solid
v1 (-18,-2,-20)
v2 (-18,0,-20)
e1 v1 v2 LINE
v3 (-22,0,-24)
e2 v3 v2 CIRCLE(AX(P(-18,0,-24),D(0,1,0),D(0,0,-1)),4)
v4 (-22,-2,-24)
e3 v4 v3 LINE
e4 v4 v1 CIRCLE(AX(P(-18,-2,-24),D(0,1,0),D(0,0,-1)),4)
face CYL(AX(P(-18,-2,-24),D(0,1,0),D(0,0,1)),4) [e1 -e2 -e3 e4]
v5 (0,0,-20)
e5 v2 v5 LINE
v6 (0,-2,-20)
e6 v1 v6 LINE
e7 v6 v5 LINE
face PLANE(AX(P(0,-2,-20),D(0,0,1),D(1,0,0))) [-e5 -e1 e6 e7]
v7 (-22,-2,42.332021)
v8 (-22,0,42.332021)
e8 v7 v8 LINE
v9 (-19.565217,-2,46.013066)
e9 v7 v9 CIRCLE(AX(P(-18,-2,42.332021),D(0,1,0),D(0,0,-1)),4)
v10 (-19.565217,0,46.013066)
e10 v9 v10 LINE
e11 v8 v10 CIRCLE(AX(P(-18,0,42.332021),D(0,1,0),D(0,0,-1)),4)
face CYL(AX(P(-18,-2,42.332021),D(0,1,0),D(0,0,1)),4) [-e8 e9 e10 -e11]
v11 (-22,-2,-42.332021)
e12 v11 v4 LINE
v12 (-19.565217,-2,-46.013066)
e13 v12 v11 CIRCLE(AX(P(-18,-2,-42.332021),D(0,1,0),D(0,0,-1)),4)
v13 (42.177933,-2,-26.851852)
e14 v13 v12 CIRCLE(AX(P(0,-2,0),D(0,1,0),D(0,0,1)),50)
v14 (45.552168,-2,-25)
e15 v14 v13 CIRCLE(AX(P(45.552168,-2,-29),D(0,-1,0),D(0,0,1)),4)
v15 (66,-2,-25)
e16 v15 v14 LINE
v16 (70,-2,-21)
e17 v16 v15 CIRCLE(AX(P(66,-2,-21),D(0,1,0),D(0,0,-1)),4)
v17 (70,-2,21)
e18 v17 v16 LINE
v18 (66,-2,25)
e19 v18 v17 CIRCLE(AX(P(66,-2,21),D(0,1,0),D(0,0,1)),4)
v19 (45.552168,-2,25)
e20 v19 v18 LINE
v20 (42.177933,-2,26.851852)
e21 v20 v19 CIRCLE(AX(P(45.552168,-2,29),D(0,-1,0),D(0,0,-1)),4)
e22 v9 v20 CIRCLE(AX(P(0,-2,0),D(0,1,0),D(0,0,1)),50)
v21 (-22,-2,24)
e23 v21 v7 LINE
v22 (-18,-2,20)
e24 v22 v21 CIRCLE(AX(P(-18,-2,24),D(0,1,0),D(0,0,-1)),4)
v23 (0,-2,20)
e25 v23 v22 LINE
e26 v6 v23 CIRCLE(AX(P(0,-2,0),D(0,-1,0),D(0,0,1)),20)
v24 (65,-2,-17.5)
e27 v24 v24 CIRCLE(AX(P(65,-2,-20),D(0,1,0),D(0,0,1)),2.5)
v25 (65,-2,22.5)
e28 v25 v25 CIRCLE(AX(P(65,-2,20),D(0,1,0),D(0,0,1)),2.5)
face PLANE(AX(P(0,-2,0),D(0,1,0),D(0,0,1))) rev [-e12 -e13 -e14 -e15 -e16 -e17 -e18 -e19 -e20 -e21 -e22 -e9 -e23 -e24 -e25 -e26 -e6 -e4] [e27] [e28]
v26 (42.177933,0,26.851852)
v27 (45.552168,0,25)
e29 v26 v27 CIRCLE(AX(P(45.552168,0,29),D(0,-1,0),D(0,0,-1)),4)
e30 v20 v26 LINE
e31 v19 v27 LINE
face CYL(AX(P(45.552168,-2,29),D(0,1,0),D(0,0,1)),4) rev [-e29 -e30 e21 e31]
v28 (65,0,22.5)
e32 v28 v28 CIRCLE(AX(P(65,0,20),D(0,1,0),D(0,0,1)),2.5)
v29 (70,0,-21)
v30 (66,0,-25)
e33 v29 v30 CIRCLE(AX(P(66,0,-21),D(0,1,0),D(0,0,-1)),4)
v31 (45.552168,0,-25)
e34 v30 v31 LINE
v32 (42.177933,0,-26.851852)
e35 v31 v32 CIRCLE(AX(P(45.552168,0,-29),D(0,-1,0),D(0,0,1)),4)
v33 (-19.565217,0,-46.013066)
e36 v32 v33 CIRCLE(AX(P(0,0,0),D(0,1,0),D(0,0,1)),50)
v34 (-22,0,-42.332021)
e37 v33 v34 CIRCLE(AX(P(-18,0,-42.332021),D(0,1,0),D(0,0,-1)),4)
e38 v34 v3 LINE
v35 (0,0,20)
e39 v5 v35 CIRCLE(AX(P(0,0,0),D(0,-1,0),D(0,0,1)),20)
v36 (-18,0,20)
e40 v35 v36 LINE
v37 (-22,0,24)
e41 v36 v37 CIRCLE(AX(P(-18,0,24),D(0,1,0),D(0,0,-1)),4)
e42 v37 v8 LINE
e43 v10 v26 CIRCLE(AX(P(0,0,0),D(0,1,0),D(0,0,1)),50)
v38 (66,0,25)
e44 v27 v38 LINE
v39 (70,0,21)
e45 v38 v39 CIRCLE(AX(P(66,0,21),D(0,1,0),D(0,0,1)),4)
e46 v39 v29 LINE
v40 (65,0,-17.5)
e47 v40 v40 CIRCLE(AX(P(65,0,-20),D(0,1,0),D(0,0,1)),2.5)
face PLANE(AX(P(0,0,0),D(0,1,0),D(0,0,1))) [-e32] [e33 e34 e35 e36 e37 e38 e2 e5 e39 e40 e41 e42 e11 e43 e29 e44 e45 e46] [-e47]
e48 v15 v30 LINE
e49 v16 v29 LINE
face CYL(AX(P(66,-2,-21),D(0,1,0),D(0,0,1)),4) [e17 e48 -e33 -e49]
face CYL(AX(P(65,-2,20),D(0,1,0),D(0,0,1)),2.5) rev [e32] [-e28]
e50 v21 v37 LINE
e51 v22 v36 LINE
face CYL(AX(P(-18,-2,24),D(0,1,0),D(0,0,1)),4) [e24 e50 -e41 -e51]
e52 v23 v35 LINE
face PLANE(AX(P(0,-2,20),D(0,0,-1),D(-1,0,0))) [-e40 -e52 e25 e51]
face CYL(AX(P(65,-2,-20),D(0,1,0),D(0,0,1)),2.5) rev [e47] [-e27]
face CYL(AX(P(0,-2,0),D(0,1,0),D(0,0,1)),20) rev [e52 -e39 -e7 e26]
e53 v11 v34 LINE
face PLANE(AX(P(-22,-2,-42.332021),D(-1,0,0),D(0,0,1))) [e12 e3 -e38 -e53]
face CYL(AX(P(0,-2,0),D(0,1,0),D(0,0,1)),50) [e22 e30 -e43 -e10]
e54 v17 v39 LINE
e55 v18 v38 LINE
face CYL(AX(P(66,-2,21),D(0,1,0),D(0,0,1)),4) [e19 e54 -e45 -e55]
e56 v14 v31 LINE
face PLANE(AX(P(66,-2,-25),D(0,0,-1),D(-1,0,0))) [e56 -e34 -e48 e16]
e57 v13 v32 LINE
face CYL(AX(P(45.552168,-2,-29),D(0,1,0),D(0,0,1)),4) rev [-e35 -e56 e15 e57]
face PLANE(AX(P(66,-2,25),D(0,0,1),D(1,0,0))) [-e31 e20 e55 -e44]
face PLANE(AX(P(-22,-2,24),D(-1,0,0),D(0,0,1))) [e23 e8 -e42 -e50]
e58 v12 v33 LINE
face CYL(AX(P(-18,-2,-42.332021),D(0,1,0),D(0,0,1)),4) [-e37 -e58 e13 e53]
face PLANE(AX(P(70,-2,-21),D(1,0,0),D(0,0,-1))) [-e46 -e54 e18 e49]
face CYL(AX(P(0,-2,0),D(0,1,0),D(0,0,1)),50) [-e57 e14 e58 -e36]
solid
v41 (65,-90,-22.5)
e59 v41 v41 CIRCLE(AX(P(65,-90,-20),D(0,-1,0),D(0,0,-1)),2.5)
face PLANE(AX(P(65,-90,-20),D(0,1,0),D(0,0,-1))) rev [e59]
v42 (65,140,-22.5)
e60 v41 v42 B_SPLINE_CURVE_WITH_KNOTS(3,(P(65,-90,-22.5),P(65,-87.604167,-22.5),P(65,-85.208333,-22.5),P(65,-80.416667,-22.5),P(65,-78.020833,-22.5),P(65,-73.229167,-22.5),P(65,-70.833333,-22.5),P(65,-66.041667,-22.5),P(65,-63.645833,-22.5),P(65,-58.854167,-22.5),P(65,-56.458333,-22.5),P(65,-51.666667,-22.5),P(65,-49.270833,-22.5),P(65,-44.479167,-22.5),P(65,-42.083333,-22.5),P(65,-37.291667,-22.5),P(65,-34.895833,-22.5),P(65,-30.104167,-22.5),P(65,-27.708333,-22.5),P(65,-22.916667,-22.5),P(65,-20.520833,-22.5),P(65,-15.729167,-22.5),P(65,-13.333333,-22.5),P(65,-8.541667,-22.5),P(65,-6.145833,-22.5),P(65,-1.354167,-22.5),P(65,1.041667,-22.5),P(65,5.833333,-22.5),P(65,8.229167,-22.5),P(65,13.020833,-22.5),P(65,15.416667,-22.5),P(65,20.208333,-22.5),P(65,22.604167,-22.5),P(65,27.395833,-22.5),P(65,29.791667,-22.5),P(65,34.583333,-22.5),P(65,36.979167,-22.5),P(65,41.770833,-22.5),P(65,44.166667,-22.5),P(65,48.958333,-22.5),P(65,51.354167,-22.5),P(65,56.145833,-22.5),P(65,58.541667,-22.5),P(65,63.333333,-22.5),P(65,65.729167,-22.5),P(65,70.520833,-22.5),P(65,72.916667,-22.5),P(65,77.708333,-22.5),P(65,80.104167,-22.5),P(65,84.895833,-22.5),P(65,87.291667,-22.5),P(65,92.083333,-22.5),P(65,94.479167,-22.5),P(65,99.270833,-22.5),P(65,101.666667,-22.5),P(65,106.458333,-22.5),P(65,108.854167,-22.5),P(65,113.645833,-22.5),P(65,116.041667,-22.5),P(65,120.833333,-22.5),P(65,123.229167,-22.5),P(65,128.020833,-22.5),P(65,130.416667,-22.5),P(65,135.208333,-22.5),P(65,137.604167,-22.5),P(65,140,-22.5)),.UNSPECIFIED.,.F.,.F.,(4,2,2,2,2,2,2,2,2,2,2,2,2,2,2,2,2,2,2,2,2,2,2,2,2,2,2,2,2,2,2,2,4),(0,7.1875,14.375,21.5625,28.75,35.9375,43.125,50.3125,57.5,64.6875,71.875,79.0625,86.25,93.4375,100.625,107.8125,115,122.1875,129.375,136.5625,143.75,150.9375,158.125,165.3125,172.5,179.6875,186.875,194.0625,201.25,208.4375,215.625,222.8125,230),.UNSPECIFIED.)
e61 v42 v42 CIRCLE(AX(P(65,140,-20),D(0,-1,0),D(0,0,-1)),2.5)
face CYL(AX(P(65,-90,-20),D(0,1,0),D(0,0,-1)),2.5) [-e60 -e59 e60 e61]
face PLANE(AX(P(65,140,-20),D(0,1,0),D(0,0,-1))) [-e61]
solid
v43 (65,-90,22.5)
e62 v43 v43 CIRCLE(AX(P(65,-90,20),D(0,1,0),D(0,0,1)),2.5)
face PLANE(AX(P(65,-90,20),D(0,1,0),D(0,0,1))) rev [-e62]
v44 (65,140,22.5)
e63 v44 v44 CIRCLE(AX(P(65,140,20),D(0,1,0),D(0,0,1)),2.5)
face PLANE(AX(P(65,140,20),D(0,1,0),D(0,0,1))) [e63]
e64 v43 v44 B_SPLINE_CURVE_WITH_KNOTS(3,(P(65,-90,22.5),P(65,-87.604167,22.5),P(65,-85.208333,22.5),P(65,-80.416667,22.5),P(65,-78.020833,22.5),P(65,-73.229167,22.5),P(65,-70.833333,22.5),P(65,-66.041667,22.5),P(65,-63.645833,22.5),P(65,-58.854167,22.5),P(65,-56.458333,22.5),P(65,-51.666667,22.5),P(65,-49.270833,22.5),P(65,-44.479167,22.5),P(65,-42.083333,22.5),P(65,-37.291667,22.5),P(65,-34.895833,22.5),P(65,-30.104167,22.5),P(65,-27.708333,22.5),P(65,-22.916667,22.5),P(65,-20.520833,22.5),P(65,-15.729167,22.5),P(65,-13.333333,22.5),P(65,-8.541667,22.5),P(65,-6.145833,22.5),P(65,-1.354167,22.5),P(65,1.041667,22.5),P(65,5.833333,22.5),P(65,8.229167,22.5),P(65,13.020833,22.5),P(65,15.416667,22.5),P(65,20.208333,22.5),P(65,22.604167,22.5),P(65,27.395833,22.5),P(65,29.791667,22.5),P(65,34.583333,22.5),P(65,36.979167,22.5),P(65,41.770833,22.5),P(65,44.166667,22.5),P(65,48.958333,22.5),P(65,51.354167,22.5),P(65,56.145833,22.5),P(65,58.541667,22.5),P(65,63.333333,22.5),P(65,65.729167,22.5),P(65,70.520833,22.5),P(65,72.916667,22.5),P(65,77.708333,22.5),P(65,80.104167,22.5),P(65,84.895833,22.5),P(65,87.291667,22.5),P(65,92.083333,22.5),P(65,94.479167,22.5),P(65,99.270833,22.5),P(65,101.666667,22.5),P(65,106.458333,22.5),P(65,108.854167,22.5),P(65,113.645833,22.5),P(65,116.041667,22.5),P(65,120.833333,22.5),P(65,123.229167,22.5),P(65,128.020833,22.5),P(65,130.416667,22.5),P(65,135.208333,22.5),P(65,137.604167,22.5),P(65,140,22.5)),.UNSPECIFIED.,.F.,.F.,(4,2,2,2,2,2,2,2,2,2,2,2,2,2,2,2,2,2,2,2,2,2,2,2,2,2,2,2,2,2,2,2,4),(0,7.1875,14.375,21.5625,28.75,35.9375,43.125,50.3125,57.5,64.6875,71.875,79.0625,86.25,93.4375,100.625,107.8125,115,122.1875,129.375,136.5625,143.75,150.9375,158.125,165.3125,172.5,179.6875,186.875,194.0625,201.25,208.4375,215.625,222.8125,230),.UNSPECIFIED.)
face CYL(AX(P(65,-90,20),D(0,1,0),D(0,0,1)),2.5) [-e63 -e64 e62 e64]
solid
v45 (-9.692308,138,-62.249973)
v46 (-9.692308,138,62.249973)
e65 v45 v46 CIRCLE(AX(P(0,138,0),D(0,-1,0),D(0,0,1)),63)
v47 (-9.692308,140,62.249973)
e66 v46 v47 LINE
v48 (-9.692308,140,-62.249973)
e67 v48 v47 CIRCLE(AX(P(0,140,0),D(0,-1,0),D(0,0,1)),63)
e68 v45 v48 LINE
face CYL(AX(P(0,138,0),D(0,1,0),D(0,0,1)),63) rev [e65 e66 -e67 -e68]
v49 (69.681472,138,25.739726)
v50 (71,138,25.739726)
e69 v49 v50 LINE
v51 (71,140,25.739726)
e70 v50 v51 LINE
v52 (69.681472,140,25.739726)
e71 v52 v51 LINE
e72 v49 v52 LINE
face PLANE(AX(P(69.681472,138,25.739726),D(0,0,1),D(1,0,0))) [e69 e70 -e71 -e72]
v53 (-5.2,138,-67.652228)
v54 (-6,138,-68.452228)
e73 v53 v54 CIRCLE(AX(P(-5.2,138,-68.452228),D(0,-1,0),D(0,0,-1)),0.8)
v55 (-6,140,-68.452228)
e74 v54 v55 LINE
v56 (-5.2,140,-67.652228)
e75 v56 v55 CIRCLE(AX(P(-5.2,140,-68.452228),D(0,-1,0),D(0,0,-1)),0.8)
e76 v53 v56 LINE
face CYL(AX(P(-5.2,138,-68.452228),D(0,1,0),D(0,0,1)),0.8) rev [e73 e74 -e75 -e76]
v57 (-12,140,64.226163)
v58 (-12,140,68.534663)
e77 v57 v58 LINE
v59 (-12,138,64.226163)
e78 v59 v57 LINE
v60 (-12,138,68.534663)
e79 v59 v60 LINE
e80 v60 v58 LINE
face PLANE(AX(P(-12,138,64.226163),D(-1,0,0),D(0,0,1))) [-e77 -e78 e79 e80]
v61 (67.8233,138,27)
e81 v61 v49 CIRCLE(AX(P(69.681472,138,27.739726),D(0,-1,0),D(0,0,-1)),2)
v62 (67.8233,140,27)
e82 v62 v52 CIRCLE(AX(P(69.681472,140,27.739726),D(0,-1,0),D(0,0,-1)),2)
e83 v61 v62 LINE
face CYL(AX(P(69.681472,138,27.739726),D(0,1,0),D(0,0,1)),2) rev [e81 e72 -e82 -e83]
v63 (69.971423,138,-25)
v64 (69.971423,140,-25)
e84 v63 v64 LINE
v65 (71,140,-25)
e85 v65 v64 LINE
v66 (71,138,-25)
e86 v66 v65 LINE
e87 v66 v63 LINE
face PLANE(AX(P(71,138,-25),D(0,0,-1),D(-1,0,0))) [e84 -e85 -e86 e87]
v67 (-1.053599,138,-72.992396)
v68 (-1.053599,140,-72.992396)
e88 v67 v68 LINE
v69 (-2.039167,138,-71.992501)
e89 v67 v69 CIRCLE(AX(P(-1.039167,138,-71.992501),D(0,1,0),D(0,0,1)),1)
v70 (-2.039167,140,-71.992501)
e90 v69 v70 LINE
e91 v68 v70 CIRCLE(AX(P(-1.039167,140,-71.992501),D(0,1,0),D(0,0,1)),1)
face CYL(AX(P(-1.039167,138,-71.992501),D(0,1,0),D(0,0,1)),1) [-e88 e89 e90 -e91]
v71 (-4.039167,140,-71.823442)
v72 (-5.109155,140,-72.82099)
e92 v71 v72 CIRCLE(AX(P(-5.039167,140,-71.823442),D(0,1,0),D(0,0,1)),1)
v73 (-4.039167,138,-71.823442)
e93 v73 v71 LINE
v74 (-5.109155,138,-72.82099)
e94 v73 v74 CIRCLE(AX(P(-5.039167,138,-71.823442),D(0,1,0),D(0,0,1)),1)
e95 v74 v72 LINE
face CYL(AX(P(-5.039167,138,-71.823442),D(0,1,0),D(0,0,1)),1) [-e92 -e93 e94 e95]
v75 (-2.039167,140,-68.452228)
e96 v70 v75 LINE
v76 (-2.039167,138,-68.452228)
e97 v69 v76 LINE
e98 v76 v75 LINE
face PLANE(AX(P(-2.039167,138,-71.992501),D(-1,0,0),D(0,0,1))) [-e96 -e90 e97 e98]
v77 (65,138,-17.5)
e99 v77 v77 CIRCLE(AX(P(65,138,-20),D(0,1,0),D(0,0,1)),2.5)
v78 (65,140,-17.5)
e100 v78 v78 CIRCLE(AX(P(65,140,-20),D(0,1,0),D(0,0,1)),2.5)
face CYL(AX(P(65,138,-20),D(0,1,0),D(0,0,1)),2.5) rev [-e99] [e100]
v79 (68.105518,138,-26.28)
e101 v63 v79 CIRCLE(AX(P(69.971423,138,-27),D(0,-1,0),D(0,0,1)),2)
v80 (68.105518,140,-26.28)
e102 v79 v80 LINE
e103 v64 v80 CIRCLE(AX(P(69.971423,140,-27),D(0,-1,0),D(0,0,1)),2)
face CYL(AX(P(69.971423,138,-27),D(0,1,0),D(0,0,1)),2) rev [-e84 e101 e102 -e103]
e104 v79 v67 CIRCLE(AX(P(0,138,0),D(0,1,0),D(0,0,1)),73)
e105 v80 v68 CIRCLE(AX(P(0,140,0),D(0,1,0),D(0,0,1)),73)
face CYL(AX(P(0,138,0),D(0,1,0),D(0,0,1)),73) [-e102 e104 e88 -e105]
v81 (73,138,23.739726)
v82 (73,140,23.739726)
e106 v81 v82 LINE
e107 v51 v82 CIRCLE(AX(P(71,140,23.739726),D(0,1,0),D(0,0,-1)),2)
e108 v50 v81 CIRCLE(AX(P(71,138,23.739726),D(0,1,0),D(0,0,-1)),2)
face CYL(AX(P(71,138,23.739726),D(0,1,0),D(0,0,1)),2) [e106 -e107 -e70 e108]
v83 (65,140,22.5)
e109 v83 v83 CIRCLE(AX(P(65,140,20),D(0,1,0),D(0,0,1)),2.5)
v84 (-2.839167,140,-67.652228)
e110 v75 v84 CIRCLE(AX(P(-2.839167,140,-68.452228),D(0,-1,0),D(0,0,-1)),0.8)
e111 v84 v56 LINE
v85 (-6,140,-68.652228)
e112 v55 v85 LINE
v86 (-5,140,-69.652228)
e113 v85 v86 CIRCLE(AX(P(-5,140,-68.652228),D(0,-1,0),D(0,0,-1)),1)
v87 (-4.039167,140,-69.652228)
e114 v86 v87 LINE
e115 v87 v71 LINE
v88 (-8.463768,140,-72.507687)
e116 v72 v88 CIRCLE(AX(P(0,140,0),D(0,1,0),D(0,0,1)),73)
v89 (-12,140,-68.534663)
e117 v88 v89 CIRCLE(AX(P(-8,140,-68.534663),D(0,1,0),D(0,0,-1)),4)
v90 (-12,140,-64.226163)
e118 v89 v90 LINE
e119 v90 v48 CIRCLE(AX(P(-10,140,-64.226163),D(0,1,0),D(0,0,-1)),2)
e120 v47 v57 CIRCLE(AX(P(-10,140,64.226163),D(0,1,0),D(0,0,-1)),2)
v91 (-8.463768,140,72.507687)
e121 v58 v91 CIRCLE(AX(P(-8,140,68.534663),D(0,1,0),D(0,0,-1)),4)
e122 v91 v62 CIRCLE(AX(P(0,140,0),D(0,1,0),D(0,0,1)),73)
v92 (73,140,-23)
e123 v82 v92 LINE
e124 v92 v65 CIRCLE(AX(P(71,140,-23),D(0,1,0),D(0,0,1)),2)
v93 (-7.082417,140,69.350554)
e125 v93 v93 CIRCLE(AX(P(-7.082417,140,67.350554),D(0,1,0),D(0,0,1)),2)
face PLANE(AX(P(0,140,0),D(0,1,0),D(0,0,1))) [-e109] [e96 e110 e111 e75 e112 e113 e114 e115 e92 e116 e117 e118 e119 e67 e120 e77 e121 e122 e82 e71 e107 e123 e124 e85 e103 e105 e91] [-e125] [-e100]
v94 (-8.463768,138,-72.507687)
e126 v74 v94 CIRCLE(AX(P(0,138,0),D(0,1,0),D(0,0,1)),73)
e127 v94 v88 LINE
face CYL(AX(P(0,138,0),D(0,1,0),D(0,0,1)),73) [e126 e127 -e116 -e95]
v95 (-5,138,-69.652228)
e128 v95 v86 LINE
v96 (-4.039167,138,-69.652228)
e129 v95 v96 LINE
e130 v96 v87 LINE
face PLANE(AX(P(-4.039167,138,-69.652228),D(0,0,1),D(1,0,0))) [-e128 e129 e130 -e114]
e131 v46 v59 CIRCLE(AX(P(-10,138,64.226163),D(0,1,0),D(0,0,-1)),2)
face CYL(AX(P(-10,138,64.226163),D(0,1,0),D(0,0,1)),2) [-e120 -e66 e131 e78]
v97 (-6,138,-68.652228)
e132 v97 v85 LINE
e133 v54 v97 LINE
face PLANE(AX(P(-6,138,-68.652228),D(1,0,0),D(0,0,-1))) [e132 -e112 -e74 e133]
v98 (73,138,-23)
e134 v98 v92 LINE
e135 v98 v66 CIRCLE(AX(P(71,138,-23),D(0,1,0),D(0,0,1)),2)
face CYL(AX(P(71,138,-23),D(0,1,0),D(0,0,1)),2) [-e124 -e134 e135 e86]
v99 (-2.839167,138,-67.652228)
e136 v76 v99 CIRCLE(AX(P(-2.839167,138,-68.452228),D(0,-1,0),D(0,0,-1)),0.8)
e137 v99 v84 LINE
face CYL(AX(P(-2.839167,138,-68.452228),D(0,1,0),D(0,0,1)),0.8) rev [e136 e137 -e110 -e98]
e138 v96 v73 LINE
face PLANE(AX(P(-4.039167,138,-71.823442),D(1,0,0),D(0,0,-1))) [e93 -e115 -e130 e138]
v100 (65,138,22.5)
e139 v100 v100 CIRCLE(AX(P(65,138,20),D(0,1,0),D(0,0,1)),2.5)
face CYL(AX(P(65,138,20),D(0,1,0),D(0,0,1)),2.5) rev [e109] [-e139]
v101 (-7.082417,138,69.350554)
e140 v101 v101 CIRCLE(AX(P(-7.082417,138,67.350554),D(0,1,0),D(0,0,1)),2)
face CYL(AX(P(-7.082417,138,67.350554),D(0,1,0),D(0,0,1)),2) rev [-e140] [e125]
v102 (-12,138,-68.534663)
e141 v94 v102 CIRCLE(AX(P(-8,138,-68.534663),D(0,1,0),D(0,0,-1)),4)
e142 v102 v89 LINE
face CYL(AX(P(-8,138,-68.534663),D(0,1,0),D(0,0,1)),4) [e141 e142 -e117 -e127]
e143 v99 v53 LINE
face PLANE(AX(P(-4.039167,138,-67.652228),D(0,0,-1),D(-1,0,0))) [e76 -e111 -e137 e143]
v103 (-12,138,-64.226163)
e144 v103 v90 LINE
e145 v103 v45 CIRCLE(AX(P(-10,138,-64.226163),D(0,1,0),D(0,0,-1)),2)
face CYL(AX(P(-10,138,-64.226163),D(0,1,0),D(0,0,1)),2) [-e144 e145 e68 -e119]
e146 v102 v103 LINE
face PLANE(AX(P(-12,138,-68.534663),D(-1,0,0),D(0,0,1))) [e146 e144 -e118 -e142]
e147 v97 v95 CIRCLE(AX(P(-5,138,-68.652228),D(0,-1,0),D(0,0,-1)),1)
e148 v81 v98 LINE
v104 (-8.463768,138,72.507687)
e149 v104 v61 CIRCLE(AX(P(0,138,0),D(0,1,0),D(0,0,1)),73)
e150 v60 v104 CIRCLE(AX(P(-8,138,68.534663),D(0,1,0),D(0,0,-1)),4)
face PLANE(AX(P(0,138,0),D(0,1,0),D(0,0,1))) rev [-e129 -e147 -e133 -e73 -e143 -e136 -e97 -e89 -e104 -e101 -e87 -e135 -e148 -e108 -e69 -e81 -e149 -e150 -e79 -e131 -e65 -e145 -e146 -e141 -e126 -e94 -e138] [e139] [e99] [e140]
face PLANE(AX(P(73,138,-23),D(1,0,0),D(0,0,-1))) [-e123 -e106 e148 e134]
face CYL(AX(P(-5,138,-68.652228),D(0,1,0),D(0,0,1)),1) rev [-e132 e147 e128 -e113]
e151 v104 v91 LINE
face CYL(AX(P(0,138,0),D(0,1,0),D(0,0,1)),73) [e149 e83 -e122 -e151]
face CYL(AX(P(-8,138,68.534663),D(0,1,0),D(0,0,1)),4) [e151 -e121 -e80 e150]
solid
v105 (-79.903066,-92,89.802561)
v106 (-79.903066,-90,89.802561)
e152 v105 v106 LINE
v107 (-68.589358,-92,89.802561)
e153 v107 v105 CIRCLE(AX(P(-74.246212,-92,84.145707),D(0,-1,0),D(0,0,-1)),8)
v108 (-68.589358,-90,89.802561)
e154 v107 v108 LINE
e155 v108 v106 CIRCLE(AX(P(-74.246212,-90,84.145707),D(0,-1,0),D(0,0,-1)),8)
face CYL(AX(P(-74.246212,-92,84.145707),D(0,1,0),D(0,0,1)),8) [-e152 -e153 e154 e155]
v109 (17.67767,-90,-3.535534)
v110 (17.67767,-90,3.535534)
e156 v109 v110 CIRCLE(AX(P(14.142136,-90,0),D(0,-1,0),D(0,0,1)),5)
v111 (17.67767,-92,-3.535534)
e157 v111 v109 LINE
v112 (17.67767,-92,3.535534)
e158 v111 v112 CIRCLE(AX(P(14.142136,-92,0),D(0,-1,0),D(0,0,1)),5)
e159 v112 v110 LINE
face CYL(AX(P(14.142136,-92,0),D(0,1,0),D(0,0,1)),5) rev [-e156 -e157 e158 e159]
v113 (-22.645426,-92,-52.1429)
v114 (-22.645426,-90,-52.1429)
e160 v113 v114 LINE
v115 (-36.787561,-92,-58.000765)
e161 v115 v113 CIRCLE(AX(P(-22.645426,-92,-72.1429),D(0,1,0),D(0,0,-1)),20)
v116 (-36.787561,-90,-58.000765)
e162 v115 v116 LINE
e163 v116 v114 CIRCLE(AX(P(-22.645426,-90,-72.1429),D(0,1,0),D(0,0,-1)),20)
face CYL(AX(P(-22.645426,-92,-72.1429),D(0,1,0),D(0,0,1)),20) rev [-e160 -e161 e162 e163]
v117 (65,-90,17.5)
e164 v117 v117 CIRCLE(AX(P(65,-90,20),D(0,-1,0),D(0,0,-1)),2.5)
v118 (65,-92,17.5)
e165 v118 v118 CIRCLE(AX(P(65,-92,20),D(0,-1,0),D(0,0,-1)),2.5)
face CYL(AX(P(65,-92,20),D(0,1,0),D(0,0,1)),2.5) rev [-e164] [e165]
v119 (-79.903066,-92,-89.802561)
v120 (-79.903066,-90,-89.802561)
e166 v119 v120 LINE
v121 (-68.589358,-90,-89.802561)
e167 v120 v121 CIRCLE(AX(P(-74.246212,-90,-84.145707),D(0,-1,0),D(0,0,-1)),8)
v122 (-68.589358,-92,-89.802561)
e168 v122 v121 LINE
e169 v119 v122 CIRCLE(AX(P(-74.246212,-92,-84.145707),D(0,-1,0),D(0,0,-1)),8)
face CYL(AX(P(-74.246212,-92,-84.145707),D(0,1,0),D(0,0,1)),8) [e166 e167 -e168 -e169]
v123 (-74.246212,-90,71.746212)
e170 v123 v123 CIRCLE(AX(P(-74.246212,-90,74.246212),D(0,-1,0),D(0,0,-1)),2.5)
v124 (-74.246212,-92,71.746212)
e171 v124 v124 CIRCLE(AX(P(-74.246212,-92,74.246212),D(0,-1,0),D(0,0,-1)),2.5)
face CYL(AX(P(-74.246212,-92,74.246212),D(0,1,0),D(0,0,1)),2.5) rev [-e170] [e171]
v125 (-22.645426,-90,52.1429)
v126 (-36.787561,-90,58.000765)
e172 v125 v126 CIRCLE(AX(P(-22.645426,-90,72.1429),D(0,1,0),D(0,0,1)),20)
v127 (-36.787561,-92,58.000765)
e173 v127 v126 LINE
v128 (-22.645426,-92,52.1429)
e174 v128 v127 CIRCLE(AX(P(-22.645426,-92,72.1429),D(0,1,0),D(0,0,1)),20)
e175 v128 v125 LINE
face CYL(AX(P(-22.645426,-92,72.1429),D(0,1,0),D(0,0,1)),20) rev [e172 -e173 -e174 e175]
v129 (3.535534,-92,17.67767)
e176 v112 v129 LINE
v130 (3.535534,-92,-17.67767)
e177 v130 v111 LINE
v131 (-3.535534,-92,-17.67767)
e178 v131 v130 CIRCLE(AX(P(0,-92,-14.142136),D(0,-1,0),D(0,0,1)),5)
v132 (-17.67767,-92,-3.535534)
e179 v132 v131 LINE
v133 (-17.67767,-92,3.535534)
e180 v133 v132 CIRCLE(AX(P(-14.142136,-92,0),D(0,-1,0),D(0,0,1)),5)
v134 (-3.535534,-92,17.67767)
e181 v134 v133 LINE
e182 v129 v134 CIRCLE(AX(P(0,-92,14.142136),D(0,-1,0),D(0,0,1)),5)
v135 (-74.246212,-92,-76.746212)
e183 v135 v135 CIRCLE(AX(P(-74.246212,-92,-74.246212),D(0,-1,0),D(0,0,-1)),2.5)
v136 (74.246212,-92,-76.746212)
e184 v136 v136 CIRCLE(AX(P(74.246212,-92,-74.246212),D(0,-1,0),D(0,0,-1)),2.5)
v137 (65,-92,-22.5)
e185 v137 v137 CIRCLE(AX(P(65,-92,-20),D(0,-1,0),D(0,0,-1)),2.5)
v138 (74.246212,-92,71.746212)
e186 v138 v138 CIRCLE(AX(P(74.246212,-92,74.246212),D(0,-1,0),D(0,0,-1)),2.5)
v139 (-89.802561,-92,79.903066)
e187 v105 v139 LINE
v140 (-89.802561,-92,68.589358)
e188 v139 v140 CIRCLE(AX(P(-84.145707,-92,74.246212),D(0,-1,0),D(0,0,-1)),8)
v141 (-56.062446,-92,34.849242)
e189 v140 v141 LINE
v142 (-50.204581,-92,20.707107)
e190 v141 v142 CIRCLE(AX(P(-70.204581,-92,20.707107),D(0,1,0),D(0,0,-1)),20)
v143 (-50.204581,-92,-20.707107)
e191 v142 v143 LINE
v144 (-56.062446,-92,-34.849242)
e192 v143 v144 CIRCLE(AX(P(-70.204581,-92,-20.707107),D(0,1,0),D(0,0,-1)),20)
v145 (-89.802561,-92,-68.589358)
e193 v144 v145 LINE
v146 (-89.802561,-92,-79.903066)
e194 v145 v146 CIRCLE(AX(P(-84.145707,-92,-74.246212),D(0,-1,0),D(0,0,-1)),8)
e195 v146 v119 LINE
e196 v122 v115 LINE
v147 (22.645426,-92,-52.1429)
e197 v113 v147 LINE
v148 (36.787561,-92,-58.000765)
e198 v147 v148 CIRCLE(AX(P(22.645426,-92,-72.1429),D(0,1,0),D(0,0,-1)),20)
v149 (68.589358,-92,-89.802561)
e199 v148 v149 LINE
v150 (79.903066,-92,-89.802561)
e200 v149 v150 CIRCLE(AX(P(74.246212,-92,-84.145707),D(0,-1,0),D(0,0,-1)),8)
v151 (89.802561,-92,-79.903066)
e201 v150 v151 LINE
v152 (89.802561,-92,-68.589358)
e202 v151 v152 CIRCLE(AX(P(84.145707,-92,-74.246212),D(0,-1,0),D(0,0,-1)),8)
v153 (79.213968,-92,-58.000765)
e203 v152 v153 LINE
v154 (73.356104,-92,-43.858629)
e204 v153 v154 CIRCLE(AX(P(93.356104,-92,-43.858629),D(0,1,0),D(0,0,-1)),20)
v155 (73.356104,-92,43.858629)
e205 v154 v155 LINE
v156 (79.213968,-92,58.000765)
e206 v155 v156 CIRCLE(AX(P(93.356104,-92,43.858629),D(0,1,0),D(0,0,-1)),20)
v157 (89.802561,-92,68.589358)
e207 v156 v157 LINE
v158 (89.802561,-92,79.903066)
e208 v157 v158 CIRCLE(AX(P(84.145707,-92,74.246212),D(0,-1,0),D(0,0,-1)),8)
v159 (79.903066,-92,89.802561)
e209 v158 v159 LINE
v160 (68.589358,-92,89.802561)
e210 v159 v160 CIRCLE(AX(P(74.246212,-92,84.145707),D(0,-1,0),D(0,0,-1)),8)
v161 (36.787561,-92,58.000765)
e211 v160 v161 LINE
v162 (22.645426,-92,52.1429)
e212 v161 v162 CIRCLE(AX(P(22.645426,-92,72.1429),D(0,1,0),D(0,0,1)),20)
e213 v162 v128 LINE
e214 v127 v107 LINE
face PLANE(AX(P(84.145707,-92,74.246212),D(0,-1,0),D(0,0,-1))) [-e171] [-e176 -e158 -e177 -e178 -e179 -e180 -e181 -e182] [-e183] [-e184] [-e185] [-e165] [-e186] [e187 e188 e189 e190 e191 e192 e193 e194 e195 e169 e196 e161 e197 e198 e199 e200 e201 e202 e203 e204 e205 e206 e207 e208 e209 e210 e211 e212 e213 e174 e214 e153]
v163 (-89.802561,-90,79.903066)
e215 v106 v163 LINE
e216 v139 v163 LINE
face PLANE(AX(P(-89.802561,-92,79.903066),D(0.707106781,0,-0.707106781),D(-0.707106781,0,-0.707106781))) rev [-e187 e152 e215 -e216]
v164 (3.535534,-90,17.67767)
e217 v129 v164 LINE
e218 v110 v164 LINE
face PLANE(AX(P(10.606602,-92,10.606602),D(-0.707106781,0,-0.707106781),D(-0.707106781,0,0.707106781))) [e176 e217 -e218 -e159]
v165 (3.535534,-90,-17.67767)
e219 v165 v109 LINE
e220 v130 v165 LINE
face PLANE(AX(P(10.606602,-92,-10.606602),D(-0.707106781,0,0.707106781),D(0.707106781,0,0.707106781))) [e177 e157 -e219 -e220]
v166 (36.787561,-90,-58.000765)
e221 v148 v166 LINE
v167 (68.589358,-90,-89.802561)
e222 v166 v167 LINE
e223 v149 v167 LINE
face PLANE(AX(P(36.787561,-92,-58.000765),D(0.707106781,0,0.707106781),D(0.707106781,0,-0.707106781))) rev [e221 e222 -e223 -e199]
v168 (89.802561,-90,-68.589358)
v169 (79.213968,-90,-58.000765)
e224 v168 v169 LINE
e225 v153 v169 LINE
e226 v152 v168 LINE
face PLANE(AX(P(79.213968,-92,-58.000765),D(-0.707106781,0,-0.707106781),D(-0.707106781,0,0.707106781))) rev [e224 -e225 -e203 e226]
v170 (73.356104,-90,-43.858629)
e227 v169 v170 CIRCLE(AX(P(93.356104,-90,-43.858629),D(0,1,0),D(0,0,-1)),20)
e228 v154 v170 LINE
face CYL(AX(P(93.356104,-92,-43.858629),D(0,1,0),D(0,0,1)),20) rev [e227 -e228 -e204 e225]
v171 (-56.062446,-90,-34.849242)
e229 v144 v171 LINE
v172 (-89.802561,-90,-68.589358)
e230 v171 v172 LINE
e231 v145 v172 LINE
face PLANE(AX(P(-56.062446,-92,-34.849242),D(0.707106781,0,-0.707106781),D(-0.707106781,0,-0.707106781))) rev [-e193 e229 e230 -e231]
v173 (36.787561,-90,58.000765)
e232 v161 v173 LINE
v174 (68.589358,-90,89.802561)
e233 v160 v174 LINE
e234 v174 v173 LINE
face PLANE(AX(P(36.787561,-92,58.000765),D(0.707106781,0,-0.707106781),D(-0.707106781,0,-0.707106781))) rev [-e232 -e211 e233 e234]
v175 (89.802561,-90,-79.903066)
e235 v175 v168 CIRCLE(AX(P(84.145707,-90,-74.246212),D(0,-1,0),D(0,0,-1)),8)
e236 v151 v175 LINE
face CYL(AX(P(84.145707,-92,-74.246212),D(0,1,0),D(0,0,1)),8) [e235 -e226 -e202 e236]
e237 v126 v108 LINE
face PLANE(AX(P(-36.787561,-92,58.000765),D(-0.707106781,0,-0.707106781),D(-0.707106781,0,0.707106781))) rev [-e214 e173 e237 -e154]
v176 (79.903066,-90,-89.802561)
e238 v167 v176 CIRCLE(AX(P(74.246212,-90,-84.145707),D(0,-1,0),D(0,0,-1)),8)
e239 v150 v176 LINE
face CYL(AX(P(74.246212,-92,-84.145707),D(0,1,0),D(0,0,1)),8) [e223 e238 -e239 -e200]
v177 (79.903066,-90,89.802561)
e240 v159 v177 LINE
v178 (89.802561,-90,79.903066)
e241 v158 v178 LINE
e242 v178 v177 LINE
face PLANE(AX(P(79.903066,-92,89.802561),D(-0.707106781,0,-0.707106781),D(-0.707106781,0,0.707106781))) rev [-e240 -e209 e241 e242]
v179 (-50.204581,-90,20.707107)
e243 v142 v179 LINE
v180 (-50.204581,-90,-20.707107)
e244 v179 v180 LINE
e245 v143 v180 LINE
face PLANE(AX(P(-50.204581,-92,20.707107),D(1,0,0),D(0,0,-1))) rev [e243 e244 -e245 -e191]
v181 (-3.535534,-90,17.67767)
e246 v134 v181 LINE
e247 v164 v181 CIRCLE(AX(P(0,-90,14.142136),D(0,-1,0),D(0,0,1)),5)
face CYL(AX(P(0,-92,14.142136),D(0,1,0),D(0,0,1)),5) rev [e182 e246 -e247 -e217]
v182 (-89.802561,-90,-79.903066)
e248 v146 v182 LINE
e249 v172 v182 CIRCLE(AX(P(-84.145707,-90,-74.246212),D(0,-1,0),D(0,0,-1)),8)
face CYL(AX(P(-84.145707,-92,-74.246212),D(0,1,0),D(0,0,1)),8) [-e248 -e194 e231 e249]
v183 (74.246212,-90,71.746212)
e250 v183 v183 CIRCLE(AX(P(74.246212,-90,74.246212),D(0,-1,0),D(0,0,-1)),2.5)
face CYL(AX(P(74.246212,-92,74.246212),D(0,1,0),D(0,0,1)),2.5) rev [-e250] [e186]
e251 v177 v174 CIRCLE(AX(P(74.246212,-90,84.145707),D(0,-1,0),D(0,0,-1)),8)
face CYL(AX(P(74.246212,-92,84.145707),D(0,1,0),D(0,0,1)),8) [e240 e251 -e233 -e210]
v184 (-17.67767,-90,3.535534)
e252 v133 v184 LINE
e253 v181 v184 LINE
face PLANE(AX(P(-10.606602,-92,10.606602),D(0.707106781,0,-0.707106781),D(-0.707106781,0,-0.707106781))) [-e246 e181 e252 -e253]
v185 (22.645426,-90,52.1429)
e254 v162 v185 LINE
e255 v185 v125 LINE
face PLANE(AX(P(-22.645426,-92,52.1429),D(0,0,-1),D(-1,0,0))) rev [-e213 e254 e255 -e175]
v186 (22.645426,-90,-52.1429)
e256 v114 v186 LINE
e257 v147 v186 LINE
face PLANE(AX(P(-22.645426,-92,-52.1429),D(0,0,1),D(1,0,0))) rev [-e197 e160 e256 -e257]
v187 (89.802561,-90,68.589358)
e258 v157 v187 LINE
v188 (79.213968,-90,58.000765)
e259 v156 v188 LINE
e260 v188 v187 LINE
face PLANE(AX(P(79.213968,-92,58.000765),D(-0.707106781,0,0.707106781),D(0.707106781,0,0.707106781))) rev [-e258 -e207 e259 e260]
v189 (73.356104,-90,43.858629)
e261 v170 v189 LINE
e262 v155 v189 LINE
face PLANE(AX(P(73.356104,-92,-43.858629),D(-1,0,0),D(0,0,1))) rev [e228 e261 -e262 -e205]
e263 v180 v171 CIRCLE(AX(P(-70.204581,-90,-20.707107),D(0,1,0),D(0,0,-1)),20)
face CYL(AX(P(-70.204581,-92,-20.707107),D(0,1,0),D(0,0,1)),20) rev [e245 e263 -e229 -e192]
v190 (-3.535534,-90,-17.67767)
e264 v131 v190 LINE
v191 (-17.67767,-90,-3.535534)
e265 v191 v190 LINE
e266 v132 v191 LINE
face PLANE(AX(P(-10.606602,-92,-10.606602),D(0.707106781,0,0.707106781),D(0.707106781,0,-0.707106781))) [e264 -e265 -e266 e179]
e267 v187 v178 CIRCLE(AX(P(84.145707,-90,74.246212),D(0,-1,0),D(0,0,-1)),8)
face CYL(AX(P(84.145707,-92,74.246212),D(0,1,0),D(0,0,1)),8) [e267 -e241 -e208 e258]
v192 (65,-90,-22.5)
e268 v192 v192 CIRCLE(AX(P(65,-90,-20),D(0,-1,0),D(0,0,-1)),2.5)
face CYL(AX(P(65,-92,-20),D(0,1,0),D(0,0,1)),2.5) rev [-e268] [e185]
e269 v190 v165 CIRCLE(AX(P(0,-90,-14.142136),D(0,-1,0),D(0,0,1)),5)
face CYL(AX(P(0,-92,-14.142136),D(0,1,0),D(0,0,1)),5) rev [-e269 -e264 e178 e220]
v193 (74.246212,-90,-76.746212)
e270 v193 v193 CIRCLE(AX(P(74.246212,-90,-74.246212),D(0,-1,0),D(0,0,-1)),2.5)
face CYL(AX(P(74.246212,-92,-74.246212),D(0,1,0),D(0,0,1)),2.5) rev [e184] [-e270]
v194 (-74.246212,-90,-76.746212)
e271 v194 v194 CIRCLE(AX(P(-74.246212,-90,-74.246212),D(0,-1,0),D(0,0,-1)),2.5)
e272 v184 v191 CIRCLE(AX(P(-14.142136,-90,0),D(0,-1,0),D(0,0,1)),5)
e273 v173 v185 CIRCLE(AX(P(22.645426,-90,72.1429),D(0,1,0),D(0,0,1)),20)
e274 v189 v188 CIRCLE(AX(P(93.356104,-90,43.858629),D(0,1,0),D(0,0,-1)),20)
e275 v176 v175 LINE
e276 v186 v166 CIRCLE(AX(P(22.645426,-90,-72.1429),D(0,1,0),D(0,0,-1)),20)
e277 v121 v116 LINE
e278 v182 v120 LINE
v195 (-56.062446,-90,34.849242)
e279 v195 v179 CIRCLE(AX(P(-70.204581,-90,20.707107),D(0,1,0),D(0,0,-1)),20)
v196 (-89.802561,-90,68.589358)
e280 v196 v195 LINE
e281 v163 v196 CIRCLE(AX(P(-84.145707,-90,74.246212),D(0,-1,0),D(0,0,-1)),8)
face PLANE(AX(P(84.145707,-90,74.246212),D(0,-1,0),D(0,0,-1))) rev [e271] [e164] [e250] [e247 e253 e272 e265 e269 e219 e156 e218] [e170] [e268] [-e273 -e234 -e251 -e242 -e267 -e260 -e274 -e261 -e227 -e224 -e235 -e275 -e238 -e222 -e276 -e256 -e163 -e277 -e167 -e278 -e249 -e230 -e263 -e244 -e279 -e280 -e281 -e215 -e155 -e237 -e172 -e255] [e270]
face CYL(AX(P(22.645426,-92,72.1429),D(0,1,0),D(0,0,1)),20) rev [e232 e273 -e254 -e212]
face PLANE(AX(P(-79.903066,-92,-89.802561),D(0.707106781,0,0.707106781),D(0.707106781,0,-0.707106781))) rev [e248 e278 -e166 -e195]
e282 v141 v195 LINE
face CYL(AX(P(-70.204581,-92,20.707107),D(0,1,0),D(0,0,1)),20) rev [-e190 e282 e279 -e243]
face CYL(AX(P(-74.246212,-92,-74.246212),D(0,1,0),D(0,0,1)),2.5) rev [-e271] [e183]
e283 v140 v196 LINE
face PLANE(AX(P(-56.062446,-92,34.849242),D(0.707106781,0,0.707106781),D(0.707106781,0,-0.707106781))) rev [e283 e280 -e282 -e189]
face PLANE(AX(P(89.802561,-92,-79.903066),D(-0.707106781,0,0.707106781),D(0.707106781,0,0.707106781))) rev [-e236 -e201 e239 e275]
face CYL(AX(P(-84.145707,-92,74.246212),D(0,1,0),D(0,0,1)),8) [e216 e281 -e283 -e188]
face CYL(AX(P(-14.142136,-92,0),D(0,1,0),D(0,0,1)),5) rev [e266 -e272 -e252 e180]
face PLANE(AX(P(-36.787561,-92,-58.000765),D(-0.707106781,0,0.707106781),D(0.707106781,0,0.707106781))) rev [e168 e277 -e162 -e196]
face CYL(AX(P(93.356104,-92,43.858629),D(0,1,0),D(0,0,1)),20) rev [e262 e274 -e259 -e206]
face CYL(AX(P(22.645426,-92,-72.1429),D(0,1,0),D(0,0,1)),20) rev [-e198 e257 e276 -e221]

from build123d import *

# Parameters (mm, degrees)
SKETCH39_R               = 2.5
BASE_FLANGE3_DEPTH       = 2
BOSS_EXTRUDE1_DEPTH      = 140
BOSS_EXTRUDE1_DEPTH_BACK = 90
SKETCH42_R               = 2.5
SKETCH47_R               = 2.5
SKETCH47_R_2             = 2
BASE_FLANGE5_DEPTH       = 2
SKETCH48_R               = 2.5
BASE_FLANGE7_DEPTH       = 2


# Sheet-metal steps are written as plain solids
with BuildPart() as part:
    # Sketch39 → Base-Flange3 (new body)
    with BuildSketch(Plane(origin=(0, 0, 0), x_dir=(1, 0, 0), z_dir=(0, 1, 0))):
        with BuildLine():
            Line((0, -20), (-18, -20))
            ThreePointArc((-18, -20), (-20.828427125, -21.171572875), (-22, -24))
            Line((-22, -24), (-22, -42.332020977))
            ThreePointArc((-22, -42.332020977), (-21.336230625, -44.538730115), (-19.565217391, -46.013066279))
            ThreePointArc((-19.565217391, -46.013066279), (14.819641158, -47.753306021), (42.177933237, -26.851851852))
            ThreePointArc((42.177933237, -26.851851852), (43.627666998, -25.49339248), (45.552167896, -25))
            Line((45.552167896, -25), (66, -25))
            ThreePointArc((66, -25), (68.828427125, -23.828427125), (70, -21))
            Line((70, -21), (70, 21))
            ThreePointArc((70, 21), (68.828427125, 23.828427125), (66, 25))
            Line((66, 25), (45.552167896, 25))
            ThreePointArc((45.552167896, 25), (43.627666998, 25.49339248), (42.177933237, 26.851851852))
            ThreePointArc((42.177933237, 26.851851852), (14.819641158, 47.753306021), (-19.565217391, 46.013066279))
            ThreePointArc((-19.565217391, 46.013066279), (-21.336230625, 44.538730115), (-22, 42.332020977))
            Line((-22, 42.332020977), (-22, 24))
            ThreePointArc((-22, 24), (-20.828427125, 21.171572875), (-18, 20))
            Line((-18, 20), (0, 20))
            ThreePointArc((0, 20), (20, 0), (0, -20))
        make_face()
        with Locations(Location((65, -20, 0), (0, 0, 270))):
            Circle(SKETCH39_R, mode=Mode.SUBTRACT)
        with Locations(Location((65, 20, 0), (0, 0, 270))):
            Circle(SKETCH39_R, mode=Mode.SUBTRACT)
    extrude(amount=-BASE_FLANGE3_DEPTH)


with BuildPart() as body_2:
    # Sketch42 → Boss-Extrude1 (new, two sides: drawn at the far end of the back side and taken through both)
    with BuildSketch(Plane(origin=(0, 0, 0), x_dir=(1, 0, 0), z_dir=(0, 1, 0)).offset(-BOSS_EXTRUDE1_DEPTH_BACK)):
        with Locations(Location((65, -20, 0), (0, 0, 270))):
            Circle(SKETCH42_R)
    extrude(amount=BOSS_EXTRUDE1_DEPTH + BOSS_EXTRUDE1_DEPTH_BACK)


with BuildPart() as body_3:
    # Mirror2: mirrored copy
    add(body_2.part.mirror(Plane.XY))


with BuildPart() as body_4:
    # Sketch47 → Base-Flange5 (new body)
    with BuildSketch(Plane(origin=(0, 140, 0), x_dir=(1, 0, 0), z_dir=(0, 1, 0))):
        with BuildLine():
            Line((-12, 68.534662763), (-12, 64.226162893))
            ThreePointArc((-12, 64.226162893), (-11.300887271, 62.707053843), (-9.692307692, 62.249973266))
            ThreePointArc((-9.692307692, 62.249973266), (63, 0), (-9.692307692, -62.249973266))
            ThreePointArc((-9.692307692, -62.249973266), (-11.300887271, -62.707053843), (-12, -64.226162893))
            Line((-12, -64.226162893), (-12, -68.534662763))
            ThreePointArc((-12, -68.534662763), (-10.987898297, -71.19407318), (-8.463768116, -72.507686691))
            ThreePointArc((-8.463768116, -72.507686691), (37.398207021, -62.69269584), (67.823299831, -27))
            ThreePointArc((67.823299831, -27), (68.558853183, -26.08451425), (69.681472429, -25.739726027))
            Line((69.681472429, -25.739726027), (71, -25.739726027))
            ThreePointArc((71, -25.739726027), (72.414213562, -25.15393959), (73, -23.739726027))
            Line((73, -23.739726027), (73, 23))
            ThreePointArc((73, 23), (72.414213562, 24.414213562), (71, 25))
            Line((71, 25), (69.971422738, 25))
            ThreePointArc((69.971422738, 25), (68.840051888, 25.35075775), (68.105518132, 26.28))
            ThreePointArc((68.105518132, 26.28), (40.859539213, 60.493785262), (-1.053599414, 72.992396373))
            ThreePointArc((-1.053599414, 72.992396373), (-1.751357836, 72.694485978), (-2.039166545, 71.992500532))
            Line((-2.039166545, 71.992500532), (-2.039166545, 68.452227537))
            ThreePointArc((-2.039166545, 68.452227537), (-2.27348112, 67.886542112), (-2.839166545, 67.652227537))
            Line((-2.839166545, 67.652227537), (-4.039166545, 67.652227537))
            Line((-4.039166545, 67.652227537), (-5.2, 67.652227537))
            ThreePointArc((-5.2, 67.652227537), (-5.765685425, 67.886542112), (-6, 68.452227537))
            Line((-6, 68.452227537), (-6, 68.652227537))
            ThreePointArc((-6, 68.652227537), (-5.707106781, 69.359334318), (-5, 69.652227537))
            Line((-5, 69.652227537), (-4.039166545, 69.652227537))
            Line((-4.039166545, 69.652227537), (-4.039166545, 71.823441859))
            ThreePointArc((-4.039166545, 71.823441859), (-4.357253216, 72.554874845), (-5.109154969, 72.820989663))
            ThreePointArc((-5.109154969, 72.820989663), (-6.78826929, 72.683694183), (-8.463768116, 72.507686691))
            ThreePointArc((-8.463768116, 72.507686691), (-10.987898297, 71.19407318), (-12, 68.534662763))
        make_face()
        with Locations(Location((65, 20, 0), (0, 0, 270))):
            Circle(SKETCH47_R, mode=Mode.SUBTRACT)
        with Locations(Location((65, -20, 0), (0, 0, 270))):
            Circle(SKETCH47_R, mode=Mode.SUBTRACT)
        with Locations(Location((-7.0824173, -67.350554163, 0), (0, 0, 270))):
            Circle(SKETCH47_R_2, mode=Mode.SUBTRACT)
    extrude(amount=-BASE_FLANGE5_DEPTH)


with BuildPart() as body_5:
    # Sketch48 → Base-Flange7 (new body)
    with BuildSketch(Plane.XZ.offset(90)):
        with BuildLine():
            Line((79.903066274, 89.802561211), (89.802561211, 79.903066274))
            ThreePointArc((89.802561211, 79.903066274), (92.145706961, 74.246212025), (89.802561211, 68.589357775))
            Line((89.802561211, 68.589357775), (79.213968084, 58.000764649))
            ThreePointArc((79.213968084, 58.000764649), (74.878513058, 51.512297672), (73.356103708, 43.858629025))
            Line((73.356103708, 43.858629025), (73.356103708, -43.858629025))
            ThreePointArc((73.356103708, -43.858629025), (74.878513058, -51.512297672), (79.213968084, -58.000764649))
            Line((79.213968084, -58.000764649), (89.802561211, -68.589357775))
            ThreePointArc((89.802561211, -68.589357775), (92.145706961, -74.246212025), (89.802561211, -79.903066274))
            Line((89.802561211, -79.903066274), (79.903066274, -89.802561211))
            ThreePointArc((79.903066274, -89.802561211), (74.246212025, -92.145706961), (68.589357775, -89.802561211))
            Line((68.589357775, -89.802561211), (36.787561213, -58.000764649))
            ThreePointArc((36.787561213, -58.000764649), (30.299094237, -53.665309622), (22.645425589, -52.142900272))
            Line((22.645425589, -52.142900272), (-22.645425589, -52.142900272))
            ThreePointArc((-22.645425589, -52.142900272), (-30.299094237, -53.665309622), (-36.787561213, -58.000764649))
            Line((-36.787561213, -58.000764649), (-68.589357775, -89.802561211))
            ThreePointArc((-68.589357775, -89.802561211), (-74.246212025, -92.145706961), (-79.903066274, -89.802561211))
            Line((-79.903066274, -89.802561211), (-89.802561211, -79.903066274))
            ThreePointArc((-89.802561211, -79.903066274), (-92.145706961, -74.246212025), (-89.802561211, -68.589357775))
            Line((-89.802561211, -68.589357775), (-56.062445841, -34.849242405))
            ThreePointArc((-56.062445841, -34.849242405), (-51.726990814, -28.360775428), (-50.204581464, -20.707106781))
            Line((-50.204581464, -20.707106781), (-50.204581464, 20.707106781))
            ThreePointArc((-50.204581464, 20.707106781), (-51.726990814, 28.360775428), (-56.062445841, 34.849242405))
            Line((-56.062445841, 34.849242405), (-89.802561211, 68.589357775))
            ThreePointArc((-89.802561211, 68.589357775), (-92.145706961, 74.246212025), (-89.802561211, 79.903066274))
            Line((-89.802561211, 79.903066274), (-79.903066274, 89.802561211))
            ThreePointArc((-79.903066274, 89.802561211), (-74.246212025, 92.145706961), (-68.589357775, 89.802561211))
            Line((-68.589357775, 89.802561211), (-36.787561213, 58.000764649))
            ThreePointArc((-36.787561213, 58.000764649), (-30.299094236, 53.665309622), (-22.645425589, 52.142900272))
            Line((-22.645425589, 52.142900272), (22.645425589, 52.142900272))
            ThreePointArc((22.645425589, 52.142900272), (30.299094236, 53.665309622), (36.787561213, 58.000764649))
            Line((36.787561213, 58.000764649), (68.589357775, 89.802561211))
            ThreePointArc((68.589357775, 89.802561211), (74.246212025, 92.145706961), (79.903066274, 89.802561211))
        make_face()
        with Locations(Location((65, 20, 0), (0, 0, 270))):
            Circle(SKETCH48_R, mode=Mode.SUBTRACT)
        with Locations(Location((65, -20, 0), (0, 0, 270))):
            Circle(SKETCH48_R, mode=Mode.SUBTRACT)
        with Locations(Location((74.246212025, 74.246212025, 0), (0, 0, 270))):
            Circle(SKETCH48_R, mode=Mode.SUBTRACT)
        with Locations(Location((74.246212025, -74.246212025, 0), (0, 0, 270))):
            Circle(SKETCH48_R, mode=Mode.SUBTRACT)
        with Locations(Location((-74.246212025, -74.246212025, 0), (0, 0, 270))):
            Circle(SKETCH48_R, mode=Mode.SUBTRACT)
        with Locations(Location((-74.246212025, 74.246212025, 0), (0, 0, 270))):
            Circle(SKETCH48_R, mode=Mode.SUBTRACT)
        with BuildLine():
            Line((10.606601718, -10.606601718), (17.67766953, -3.535533906))
            ThreePointArc((17.67766953, -3.535533906), (19.142135624, 0), (17.67766953, 3.535533906))
            Line((17.67766953, 3.535533906), (10.606601718, 10.606601718))
            Line((10.606601718, 10.606601718), (3.535533906, 17.67766953))
            ThreePointArc((3.535533906, 17.67766953), (0, 19.142135624), (-3.535533906, 17.67766953))
            Line((-3.535533906, 17.67766953), (-10.606601718, 10.606601718))
            Line((-10.606601718, 10.606601718), (-17.67766953, 3.535533906))
            ThreePointArc((-17.67766953, 3.535533906), (-19.142135624, 0), (-17.67766953, -3.535533906))
            Line((-17.67766953, -3.535533906), (-10.606601718, -10.606601718))
            Line((-10.606601718, -10.606601718), (-3.535533906, -17.67766953))
            ThreePointArc((-3.535533906, -17.67766953), (0, -19.142135624), (3.535533906, -17.67766953))
            Line((3.535533906, -17.67766953), (10.606601718, -10.606601718))
        make_face(mode=Mode.SUBTRACT)
    extrude(amount=BASE_FLANGE7_DEPTH)


solid = Compound([part.part, body_2.part, body_3.part, body_4.part, body_5.part])
